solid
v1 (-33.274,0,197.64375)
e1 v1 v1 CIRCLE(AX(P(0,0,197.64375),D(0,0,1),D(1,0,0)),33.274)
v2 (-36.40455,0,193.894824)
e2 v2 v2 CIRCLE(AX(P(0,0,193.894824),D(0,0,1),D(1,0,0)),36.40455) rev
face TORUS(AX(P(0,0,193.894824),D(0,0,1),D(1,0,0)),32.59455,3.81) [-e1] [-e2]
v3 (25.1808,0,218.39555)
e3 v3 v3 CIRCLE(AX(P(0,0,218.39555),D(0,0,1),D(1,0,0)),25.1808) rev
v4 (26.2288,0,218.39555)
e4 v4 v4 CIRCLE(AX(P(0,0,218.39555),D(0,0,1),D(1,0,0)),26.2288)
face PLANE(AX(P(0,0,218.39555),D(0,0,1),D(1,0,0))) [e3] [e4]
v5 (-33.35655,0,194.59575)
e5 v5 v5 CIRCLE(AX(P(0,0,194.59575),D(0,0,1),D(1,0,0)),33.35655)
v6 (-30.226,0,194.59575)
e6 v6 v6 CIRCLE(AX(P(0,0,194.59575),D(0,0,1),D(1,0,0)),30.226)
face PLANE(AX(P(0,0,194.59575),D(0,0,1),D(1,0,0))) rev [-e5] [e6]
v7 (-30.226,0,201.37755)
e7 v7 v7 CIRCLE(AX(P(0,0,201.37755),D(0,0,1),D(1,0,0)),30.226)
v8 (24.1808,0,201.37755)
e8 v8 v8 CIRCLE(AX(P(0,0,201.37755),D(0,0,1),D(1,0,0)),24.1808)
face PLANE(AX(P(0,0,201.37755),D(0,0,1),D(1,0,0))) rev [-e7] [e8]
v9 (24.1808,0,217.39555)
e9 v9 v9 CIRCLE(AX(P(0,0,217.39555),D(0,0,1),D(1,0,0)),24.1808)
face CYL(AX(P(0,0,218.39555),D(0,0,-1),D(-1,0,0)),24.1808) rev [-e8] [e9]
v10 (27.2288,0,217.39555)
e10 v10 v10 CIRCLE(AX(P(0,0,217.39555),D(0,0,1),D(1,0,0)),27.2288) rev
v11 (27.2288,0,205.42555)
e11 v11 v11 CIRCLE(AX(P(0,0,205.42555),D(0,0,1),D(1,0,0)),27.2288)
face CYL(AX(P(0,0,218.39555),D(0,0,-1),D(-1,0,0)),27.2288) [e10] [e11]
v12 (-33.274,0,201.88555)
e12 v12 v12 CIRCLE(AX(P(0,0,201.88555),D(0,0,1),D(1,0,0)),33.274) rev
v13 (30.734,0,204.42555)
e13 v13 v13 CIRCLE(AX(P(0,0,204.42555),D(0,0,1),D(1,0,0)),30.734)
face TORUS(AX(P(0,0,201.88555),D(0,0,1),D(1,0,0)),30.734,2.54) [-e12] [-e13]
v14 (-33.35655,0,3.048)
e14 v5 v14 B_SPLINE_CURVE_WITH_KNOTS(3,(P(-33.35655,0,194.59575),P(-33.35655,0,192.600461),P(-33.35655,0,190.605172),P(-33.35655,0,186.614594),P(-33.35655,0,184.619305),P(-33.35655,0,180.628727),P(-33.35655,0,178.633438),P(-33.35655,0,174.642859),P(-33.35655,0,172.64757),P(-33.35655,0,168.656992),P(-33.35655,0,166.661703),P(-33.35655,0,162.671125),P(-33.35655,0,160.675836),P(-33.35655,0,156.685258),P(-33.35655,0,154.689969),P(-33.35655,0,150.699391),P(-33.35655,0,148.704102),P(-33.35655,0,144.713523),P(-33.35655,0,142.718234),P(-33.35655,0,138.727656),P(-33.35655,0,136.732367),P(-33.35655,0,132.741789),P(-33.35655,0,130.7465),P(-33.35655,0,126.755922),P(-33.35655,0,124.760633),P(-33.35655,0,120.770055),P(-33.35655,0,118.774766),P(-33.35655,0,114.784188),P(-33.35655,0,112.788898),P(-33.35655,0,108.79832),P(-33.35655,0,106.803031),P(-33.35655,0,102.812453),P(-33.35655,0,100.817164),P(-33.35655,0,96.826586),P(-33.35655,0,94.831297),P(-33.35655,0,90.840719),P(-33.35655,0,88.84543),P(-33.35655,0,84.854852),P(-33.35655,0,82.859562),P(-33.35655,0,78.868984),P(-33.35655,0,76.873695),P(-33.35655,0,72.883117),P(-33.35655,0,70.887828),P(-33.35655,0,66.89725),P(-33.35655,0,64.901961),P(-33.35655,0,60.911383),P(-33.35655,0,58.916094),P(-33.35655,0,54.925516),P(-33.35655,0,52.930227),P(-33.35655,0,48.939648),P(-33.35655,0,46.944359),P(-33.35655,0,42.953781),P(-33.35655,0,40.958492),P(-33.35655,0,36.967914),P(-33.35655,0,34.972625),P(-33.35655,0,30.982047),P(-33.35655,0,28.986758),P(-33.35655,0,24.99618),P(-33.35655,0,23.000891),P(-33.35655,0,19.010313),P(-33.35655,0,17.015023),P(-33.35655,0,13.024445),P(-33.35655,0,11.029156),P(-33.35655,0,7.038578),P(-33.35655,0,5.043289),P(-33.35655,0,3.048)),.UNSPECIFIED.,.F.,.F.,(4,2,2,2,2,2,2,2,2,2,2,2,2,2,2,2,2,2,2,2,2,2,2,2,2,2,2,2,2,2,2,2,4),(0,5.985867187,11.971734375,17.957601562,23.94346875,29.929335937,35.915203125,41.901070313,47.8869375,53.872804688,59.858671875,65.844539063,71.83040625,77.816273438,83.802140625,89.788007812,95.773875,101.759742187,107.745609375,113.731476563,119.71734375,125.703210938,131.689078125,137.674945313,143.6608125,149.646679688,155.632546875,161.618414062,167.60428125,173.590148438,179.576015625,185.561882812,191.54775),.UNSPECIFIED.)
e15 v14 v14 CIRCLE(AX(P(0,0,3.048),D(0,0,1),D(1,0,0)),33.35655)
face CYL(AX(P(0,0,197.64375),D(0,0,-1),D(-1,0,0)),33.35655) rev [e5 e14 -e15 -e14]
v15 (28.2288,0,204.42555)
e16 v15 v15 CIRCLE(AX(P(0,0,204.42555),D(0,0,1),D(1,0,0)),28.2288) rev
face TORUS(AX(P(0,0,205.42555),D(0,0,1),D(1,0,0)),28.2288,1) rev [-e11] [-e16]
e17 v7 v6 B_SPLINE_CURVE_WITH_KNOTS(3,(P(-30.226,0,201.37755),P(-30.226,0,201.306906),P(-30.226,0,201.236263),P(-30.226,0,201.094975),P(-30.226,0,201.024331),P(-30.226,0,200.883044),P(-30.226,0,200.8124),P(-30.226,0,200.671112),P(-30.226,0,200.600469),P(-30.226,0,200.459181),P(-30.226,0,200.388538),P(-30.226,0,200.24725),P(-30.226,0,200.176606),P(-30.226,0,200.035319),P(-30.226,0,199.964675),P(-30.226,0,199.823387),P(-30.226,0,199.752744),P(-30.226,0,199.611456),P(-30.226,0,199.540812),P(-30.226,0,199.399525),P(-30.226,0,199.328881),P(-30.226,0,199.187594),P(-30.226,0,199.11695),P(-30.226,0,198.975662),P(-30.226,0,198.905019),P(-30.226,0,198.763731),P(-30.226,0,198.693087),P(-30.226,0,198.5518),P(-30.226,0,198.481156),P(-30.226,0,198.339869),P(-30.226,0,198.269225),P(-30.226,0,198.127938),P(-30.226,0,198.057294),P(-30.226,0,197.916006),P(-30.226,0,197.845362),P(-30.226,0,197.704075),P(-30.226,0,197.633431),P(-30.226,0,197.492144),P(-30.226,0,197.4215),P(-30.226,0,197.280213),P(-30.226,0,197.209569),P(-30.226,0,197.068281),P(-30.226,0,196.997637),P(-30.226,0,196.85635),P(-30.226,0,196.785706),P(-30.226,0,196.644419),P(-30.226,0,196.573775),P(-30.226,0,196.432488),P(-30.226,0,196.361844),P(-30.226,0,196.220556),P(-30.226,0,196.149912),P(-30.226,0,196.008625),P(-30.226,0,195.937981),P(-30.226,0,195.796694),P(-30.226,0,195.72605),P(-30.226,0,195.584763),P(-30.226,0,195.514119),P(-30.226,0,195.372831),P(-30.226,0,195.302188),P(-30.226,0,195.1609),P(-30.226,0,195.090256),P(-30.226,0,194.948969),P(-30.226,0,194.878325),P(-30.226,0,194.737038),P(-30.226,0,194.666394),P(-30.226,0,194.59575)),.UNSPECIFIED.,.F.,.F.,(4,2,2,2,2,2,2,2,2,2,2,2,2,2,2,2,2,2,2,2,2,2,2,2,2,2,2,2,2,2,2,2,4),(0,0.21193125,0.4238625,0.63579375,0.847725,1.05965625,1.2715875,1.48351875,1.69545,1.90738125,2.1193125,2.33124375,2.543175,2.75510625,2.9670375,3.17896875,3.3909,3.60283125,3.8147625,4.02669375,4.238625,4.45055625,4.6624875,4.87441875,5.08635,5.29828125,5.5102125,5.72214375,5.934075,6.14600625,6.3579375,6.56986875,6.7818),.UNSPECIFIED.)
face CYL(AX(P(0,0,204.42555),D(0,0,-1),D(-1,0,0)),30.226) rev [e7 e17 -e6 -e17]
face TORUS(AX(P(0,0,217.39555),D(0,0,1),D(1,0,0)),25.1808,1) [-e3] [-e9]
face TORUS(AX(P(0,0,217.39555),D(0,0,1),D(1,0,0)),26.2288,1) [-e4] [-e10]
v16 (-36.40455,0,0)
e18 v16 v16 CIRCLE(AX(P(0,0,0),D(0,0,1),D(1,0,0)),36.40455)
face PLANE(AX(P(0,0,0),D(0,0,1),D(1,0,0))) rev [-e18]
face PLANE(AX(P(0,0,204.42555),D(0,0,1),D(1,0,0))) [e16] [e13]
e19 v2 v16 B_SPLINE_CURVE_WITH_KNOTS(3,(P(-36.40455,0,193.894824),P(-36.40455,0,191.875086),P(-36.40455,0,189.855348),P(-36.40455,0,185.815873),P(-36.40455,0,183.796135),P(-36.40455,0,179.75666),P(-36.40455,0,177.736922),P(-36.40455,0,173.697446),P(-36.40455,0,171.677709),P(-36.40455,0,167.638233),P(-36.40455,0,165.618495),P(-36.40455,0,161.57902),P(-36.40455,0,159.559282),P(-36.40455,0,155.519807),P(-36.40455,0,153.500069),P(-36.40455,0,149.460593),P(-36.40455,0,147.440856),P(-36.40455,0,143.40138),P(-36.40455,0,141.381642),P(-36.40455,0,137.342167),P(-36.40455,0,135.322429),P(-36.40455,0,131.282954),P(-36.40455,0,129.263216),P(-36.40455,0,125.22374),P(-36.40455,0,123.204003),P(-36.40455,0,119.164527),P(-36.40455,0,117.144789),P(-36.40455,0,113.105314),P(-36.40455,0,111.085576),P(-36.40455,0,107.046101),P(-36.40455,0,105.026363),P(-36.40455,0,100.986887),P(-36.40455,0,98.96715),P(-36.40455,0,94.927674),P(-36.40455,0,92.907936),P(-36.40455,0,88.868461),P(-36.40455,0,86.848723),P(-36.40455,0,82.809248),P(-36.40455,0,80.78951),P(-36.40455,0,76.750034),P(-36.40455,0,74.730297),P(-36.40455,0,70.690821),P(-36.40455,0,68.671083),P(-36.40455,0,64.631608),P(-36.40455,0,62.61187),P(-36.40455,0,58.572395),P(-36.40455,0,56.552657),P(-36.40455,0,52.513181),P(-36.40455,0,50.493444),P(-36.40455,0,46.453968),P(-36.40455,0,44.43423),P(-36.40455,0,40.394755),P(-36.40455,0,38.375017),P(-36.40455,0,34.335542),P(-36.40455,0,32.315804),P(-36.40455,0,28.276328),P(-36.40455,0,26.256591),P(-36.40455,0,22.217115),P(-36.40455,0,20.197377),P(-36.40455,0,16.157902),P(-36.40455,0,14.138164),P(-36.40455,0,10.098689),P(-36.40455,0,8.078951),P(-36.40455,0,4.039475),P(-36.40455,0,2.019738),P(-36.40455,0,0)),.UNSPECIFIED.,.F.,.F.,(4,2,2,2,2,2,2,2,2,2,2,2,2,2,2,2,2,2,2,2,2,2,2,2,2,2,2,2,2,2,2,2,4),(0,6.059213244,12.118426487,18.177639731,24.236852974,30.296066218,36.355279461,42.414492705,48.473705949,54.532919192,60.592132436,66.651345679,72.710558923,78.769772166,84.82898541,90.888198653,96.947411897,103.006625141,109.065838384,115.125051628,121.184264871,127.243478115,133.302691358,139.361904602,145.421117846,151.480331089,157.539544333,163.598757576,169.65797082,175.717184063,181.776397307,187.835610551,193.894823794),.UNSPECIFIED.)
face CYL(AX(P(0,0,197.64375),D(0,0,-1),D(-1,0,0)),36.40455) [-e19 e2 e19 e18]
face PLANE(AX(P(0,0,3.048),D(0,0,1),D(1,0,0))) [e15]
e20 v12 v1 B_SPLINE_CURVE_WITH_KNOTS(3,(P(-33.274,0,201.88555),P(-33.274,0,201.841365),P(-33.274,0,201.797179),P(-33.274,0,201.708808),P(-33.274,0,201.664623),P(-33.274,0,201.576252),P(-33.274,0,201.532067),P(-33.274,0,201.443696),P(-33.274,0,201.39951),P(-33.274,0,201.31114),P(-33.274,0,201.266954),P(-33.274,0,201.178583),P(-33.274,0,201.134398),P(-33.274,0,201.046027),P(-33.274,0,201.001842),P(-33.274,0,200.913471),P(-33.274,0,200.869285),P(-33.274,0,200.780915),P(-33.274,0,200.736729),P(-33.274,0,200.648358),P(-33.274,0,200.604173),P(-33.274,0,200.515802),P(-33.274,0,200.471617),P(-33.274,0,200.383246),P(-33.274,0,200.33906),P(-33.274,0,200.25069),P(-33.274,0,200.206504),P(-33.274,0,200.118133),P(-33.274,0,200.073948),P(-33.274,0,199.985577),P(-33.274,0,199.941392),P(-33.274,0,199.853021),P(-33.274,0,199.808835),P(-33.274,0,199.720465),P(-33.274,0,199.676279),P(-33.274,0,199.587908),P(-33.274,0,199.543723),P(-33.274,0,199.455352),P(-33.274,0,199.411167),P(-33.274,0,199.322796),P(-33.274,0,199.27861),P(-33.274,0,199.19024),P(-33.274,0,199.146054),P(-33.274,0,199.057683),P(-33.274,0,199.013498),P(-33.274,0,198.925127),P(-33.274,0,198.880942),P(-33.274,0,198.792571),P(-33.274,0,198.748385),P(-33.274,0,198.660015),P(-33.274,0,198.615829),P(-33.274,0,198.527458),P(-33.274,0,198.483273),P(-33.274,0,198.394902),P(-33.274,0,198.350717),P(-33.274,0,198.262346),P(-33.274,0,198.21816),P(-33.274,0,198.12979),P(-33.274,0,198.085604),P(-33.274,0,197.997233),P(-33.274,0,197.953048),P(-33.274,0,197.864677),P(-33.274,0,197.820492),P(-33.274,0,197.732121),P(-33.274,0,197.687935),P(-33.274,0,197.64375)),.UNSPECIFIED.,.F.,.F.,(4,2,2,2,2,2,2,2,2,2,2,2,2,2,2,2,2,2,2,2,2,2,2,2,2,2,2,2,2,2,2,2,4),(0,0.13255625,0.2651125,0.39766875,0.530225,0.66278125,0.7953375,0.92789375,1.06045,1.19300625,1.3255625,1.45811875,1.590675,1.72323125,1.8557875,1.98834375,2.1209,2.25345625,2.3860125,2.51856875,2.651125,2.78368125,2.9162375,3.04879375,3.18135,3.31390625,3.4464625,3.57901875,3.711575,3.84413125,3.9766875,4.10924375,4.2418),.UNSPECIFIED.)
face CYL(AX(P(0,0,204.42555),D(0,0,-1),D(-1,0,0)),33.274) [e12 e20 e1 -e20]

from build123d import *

# Parameters (mm, degrees)
SKETCH1_R           = 36.40455
BOSS_EXTRUDE1_DEPTH = 197.64375
SKETCH2_R           = 33.274
BOSS_EXTRUDE2_DEPTH = 6.7818
SKETCH3_R           = 27.2288
BOSS_EXTRUDE3_DEPTH = 13.97
SHELL1_T            = -3.048
FILLET1_R           = 3.81
FILLET2_R           = 2.54
FILLET3_R           = 1
FILLET4_R           = 1.000000032


with BuildPart() as part:
    # Sketch1 → Boss-Extrude1 (new body)
    with BuildSketch(Plane.XY):
        with Locations(Location((0, 0, 0), (0, 0, 180))):
            Circle(SKETCH1_R)
    extrude(amount=BOSS_EXTRUDE1_DEPTH)

    # Sketch2 → Boss-Extrude2 (add)
    with BuildSketch(Plane.XY.offset(197.64375)):
        with Locations(Location((0, 0, 0), (0, 0, 180))):
            Circle(SKETCH2_R)
    extrude(amount=BOSS_EXTRUDE2_DEPTH)

    # Sketch3 → Boss-Extrude3 (add)
    with BuildSketch(Plane.XY.offset(204.42555)):
        Circle(SKETCH3_R)
    extrude(amount=BOSS_EXTRUDE3_DEPTH)

    # Shell1
    shell1_openings = [part.faces().sort_by_distance(p)[0] for p in [
        (0, 0, 218.39555),
    ]]
    offset(amount=SHELL1_T, openings=shell1_openings, kind=Kind.INTERSECTION)

    # Fillet1
    # the kernel refuses this fillet: 3.81 mm, written as the material it takes off along each edge
    with BuildSketch(Plane(origin=(0, 0, 197.64375), x_dir=(-1, 0, 0), z_dir=(0, 1, 0))) as fillet1_piece_1:
        with BuildLine():
            CenterArc((32.59455, -3.748926206), FILLET1_R, 0, 79.727303784)
            Line((33.274, 0), (33.287589, 0.074978524))
            ThreePointArc((33.287589, 0.074978524), (34.839275, 0.0762), (36.40455, 0.0762))
            Line((36.40455, 0.0762), (36.48075, 0))
            Line((36.48075, 0), (36.48075, -3.748926206))
            Line((36.48075, -3.748926206), (36.40455, -3.748926206))
        make_face()
    revolve(axis=Axis((0, 0, 197.64375), (0, 0, 1)), mode=Mode.SUBTRACT)

    # Fillet2
    fillet2_edges = [part.edges().sort_by_distance(p)[0] for p in [
        (33.274, 0, 204.42555),
    ]]
    fillet(fillet2_edges, radius=FILLET2_R)

    # Fillet3
    fillet3_edges = [part.edges().sort_by_distance(p)[0] for p in [
        (-27.2288, 0, 204.42555),
    ]]
    fillet(fillet3_edges, radius=FILLET3_R)

    # Fillet4
    fillet4_edges = [part.edges().sort_by_distance(p)[0] for p in [
        (-27.2288, 0, 218.39555),
        (-24.1808, 0, 218.39555),
    ]]
    fillet(fillet4_edges, radius=FILLET4_R)


solid = part.part
